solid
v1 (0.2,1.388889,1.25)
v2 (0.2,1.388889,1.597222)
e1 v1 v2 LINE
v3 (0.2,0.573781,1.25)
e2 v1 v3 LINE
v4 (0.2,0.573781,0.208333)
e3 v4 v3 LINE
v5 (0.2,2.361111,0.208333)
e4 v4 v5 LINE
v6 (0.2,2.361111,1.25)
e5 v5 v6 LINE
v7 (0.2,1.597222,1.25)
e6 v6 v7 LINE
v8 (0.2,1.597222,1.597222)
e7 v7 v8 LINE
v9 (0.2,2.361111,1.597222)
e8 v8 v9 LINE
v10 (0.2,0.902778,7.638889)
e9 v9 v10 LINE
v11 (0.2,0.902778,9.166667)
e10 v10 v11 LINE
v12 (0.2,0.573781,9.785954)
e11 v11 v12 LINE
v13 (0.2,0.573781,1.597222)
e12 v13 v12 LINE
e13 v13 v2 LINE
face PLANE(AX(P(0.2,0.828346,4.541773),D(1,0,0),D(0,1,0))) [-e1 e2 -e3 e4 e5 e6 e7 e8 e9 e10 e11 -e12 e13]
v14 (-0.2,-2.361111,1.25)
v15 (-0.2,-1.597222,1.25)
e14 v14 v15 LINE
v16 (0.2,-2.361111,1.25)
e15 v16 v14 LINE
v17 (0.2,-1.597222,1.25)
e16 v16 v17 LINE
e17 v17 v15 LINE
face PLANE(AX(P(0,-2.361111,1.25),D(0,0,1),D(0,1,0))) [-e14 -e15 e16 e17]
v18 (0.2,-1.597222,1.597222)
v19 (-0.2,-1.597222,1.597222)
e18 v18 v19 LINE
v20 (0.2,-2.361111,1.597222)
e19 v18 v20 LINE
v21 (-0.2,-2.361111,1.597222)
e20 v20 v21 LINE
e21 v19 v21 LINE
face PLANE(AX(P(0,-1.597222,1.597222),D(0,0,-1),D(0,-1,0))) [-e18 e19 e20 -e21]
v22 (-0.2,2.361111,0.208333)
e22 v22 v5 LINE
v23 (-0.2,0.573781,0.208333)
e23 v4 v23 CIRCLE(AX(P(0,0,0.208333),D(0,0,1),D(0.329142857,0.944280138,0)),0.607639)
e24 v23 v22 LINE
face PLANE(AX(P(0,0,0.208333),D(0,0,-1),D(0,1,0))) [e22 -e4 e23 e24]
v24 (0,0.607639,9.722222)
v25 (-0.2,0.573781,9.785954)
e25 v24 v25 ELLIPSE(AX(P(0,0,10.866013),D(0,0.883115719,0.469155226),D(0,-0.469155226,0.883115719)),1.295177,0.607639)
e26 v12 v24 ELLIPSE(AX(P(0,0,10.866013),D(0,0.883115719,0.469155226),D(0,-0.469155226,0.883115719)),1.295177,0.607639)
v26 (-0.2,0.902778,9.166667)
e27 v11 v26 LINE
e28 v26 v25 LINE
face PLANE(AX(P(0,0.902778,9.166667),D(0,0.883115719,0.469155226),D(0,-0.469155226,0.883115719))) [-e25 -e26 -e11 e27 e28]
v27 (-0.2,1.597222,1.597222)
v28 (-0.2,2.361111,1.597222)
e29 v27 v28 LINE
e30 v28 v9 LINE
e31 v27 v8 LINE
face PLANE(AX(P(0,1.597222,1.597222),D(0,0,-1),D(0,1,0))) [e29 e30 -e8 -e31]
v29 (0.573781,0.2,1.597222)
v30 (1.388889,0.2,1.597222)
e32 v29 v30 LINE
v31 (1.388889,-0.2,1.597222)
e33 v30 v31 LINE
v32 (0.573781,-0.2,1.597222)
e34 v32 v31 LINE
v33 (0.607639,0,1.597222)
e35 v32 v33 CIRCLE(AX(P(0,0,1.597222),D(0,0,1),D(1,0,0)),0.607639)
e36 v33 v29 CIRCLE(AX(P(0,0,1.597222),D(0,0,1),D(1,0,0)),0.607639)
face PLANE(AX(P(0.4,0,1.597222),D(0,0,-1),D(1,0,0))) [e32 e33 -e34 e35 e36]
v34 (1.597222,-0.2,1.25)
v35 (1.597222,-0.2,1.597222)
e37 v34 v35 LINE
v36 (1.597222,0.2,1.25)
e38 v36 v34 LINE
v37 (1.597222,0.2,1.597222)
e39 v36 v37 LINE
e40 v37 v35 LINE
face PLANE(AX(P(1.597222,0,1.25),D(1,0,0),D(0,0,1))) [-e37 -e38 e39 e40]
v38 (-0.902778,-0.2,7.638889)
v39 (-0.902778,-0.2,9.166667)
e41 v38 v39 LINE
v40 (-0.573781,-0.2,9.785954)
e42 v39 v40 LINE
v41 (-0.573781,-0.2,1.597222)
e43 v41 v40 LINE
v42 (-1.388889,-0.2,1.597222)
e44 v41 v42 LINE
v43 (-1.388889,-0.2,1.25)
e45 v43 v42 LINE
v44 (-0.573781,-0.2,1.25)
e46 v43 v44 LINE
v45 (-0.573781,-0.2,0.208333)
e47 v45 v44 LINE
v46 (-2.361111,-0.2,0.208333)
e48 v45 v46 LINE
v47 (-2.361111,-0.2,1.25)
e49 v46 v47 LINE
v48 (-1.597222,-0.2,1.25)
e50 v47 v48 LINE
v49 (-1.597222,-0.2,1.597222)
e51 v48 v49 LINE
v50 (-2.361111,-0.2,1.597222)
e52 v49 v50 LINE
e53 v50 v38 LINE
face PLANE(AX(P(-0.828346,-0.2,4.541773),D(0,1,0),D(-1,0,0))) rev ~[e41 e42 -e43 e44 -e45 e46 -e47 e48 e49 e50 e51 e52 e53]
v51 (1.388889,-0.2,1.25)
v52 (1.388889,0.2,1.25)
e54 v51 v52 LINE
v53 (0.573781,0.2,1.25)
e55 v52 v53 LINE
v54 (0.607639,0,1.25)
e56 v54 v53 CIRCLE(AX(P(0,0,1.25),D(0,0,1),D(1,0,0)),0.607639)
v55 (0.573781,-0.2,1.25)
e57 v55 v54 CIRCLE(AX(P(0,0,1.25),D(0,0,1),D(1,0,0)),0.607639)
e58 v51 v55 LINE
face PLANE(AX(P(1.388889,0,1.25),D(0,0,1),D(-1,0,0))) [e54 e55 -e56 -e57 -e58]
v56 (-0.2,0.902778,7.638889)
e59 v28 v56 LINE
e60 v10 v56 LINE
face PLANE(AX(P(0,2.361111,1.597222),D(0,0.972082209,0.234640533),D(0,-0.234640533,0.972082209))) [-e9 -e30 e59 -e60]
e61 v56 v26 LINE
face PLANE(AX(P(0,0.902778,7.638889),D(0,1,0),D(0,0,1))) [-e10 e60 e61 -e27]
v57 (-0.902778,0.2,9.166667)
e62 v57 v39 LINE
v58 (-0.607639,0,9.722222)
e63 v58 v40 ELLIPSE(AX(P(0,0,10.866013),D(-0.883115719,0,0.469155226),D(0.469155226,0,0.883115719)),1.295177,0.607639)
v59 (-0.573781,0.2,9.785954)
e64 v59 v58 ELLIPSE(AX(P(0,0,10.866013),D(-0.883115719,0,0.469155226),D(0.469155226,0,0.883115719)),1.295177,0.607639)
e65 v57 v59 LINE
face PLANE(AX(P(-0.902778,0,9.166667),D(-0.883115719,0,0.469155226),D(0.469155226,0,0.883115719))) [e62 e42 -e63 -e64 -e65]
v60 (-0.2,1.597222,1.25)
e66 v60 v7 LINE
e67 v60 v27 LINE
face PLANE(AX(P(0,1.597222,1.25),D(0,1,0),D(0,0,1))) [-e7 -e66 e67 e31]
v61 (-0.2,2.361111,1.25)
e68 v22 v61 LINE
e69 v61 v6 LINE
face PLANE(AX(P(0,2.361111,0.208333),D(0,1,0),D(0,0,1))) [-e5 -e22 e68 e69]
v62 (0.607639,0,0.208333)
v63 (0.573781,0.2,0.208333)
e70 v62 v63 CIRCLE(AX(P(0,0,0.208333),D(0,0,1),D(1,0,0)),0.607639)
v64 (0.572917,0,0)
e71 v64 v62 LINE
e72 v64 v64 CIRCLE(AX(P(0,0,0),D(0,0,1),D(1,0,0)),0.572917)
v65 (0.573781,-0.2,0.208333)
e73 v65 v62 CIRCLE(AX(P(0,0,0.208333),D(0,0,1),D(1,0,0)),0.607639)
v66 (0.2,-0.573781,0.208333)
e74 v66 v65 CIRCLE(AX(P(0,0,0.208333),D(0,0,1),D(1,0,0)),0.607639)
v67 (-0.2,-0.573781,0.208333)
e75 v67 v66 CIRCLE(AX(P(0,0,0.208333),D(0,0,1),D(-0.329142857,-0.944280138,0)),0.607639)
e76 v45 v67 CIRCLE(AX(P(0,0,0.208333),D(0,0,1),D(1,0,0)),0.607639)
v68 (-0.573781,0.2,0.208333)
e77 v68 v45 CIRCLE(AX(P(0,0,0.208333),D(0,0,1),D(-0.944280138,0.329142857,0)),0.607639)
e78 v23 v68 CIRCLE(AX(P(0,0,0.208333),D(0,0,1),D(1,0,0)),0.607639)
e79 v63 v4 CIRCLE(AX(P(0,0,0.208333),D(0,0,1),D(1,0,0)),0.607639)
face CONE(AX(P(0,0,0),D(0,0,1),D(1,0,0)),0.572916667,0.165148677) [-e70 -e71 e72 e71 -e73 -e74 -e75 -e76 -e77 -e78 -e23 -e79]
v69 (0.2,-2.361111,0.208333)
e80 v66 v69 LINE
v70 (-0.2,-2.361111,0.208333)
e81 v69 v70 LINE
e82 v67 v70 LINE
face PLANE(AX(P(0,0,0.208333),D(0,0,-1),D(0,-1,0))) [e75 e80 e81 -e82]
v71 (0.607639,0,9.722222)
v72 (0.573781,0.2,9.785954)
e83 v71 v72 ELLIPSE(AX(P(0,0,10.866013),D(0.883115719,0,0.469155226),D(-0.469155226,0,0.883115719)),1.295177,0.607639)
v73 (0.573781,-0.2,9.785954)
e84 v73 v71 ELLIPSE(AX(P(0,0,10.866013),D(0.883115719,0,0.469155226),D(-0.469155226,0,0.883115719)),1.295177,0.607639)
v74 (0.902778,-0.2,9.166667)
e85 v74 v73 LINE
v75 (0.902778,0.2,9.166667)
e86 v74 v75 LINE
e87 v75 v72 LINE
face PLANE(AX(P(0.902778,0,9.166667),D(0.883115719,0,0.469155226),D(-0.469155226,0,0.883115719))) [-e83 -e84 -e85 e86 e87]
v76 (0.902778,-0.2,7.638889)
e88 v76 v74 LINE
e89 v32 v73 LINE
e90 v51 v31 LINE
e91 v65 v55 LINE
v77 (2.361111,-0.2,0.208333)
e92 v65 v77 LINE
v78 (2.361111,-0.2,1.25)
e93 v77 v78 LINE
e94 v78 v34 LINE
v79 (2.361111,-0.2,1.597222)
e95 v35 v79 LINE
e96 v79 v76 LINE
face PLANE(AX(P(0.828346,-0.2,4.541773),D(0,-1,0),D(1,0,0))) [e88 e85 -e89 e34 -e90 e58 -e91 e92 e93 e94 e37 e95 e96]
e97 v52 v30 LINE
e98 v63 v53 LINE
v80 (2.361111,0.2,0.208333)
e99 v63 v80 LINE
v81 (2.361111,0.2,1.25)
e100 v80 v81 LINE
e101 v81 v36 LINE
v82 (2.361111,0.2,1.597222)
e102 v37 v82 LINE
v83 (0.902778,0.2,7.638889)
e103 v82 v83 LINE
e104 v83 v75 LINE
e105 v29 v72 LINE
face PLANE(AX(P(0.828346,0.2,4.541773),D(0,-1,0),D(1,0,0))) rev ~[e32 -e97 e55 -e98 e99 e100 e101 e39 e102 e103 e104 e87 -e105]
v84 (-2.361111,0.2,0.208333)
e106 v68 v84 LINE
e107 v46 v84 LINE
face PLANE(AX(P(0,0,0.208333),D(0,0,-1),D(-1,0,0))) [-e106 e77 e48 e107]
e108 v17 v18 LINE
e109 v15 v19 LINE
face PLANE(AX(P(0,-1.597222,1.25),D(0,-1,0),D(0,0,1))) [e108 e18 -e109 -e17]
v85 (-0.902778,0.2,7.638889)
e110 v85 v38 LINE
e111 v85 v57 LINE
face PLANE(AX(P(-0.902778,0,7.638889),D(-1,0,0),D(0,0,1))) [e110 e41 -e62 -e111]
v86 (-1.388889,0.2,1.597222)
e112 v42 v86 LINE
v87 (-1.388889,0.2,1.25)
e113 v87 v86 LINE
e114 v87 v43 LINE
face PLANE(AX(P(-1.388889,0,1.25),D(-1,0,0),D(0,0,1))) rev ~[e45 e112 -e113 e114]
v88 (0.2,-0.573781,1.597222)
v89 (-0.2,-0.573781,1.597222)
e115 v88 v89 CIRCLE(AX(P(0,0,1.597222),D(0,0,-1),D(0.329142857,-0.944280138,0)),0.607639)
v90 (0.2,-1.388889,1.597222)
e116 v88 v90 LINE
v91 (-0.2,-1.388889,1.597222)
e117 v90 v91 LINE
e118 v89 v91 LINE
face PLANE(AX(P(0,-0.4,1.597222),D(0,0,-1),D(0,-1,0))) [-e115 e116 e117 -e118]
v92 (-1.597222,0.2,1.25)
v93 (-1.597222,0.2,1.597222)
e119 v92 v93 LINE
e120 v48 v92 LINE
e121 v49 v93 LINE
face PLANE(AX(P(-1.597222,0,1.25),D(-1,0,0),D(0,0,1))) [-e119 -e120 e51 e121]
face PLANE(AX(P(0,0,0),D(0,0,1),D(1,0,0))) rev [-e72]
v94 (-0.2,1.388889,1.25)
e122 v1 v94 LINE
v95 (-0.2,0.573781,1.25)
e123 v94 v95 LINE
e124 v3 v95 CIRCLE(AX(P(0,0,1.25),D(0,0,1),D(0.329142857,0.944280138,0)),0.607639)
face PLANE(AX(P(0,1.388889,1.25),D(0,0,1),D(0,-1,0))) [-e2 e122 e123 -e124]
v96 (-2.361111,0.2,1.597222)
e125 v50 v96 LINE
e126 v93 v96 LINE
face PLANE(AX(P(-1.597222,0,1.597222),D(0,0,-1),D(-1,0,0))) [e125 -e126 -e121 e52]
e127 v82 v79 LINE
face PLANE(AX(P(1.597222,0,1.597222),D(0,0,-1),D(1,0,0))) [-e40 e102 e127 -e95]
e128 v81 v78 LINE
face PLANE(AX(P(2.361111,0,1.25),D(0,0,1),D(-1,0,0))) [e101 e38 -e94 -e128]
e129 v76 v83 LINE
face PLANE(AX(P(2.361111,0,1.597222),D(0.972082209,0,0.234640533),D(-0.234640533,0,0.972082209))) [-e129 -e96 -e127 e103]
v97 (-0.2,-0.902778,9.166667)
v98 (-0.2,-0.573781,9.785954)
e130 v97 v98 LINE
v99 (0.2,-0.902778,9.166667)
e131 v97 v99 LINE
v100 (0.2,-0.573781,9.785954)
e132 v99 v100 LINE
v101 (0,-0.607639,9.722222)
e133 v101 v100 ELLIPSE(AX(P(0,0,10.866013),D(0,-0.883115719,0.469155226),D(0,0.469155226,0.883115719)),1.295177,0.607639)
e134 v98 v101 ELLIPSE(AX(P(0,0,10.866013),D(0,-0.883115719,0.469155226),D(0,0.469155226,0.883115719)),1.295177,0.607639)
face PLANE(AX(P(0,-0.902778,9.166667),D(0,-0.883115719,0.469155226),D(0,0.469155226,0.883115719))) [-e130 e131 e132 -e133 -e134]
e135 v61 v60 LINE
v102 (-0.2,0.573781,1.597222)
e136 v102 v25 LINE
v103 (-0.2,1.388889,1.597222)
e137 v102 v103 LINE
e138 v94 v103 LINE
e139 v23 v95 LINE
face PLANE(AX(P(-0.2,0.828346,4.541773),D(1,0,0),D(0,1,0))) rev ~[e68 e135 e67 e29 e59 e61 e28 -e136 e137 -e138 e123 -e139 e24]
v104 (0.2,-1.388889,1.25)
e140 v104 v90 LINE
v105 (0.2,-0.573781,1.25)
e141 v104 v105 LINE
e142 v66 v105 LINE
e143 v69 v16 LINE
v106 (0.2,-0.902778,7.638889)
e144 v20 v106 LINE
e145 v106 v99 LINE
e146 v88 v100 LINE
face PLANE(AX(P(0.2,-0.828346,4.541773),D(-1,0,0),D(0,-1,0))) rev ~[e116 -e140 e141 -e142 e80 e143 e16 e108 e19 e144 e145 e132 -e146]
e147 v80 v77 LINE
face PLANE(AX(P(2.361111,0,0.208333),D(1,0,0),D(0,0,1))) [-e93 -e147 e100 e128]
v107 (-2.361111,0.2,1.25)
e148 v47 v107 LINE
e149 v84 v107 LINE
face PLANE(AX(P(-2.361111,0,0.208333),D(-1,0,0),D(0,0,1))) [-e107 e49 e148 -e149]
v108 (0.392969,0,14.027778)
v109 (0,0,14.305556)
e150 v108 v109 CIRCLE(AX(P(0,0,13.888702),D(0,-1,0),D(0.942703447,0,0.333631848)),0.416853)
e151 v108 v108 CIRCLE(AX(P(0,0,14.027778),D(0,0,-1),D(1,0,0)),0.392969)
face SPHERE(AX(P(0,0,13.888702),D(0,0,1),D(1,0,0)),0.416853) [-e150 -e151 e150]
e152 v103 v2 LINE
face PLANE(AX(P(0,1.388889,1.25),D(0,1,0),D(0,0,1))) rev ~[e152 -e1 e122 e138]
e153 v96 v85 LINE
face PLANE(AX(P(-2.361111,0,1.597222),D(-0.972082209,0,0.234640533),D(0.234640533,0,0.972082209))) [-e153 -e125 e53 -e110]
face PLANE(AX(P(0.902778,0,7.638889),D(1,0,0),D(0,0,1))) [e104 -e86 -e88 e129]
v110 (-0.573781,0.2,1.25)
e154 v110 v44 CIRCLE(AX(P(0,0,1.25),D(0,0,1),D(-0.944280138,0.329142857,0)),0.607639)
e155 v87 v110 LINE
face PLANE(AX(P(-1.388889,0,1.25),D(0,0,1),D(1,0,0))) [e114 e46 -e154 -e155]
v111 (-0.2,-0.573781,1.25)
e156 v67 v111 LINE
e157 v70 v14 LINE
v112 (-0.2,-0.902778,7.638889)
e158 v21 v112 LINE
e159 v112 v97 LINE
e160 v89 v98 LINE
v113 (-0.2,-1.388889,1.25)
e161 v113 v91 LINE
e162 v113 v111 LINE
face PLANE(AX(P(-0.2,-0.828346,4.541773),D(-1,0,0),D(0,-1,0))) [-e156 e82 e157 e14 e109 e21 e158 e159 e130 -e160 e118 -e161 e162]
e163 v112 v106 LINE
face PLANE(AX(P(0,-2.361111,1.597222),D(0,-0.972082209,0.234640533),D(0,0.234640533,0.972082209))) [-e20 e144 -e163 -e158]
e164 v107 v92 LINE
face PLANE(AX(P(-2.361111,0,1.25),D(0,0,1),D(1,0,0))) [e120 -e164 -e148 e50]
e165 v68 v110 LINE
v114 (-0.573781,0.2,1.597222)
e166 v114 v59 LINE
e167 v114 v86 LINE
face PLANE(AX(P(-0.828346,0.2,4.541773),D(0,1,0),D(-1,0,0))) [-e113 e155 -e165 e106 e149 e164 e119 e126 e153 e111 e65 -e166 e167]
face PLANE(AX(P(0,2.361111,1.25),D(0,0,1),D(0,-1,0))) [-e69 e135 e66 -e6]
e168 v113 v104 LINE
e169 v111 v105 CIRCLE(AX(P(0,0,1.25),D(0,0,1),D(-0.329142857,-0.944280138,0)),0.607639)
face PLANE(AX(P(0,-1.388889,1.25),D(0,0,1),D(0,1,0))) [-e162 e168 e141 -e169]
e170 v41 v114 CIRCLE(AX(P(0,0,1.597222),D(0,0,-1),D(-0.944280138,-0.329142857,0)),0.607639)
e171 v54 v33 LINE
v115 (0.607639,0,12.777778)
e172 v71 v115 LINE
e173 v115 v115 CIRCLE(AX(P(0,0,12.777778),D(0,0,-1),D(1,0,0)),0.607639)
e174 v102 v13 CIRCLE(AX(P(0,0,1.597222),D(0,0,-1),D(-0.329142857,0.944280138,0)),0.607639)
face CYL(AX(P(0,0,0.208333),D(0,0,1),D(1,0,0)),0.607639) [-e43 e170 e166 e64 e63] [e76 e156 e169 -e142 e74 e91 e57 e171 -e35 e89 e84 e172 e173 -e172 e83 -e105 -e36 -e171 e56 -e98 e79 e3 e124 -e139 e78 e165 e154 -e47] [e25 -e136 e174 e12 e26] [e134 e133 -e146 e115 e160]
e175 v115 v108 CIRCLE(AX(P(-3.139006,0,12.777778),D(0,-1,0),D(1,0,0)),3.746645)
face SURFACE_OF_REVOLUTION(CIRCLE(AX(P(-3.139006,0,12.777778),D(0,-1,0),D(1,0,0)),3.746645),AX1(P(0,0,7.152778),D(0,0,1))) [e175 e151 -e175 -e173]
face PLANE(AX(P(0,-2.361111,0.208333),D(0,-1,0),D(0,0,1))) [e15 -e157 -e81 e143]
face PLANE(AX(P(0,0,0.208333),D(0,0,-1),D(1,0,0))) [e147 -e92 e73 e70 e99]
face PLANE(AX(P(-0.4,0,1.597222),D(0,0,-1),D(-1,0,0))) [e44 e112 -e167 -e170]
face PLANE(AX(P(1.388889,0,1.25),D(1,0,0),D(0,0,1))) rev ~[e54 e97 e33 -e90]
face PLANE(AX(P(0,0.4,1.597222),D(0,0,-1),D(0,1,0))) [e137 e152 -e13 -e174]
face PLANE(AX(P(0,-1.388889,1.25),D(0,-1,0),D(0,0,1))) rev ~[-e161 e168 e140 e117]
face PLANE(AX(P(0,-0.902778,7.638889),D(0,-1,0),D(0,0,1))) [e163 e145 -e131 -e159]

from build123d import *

# Parameters (mm, degrees)
F2_W     = 0.2083333333
F2_H     = 0.3472222222
F3_DEPTH = 0.2
F4_COUNT = 4


# Not quite as in the source:
# - a feature names something its author has since deleted; it is built from what else it names


with BuildPart() as f1:
    # F0 (on Front) → F1 (revolve)
    with BuildSketch(Plane.XZ):
        with BuildLine():
            Line((0, 14.3055555556), (0, 0))
            Line((0, 0), (0.5729166667, 0))
            Line((0.5729166667, 0), (0.6076388889, 0.2083333333))
            Line((0.6076388889, 0.2083333333), (0.6076388889, 12.7777777778))
            ThreePointArc((0.6076388889, 12.7777777778), (0.5535814562, 13.4119274316), (0.3929690636, 14.0277777778))
            ThreePointArc((0.3929690636, 14.0277777778), (0.2406164888, 14.2290996444), (0, 14.3055555556))
        make_face()
    revolve(axis=Axis((0, 0, 7.1527777778), (0, 0, 1)))

    # F2 (on Front) → F3 (join, symmetric)
    with BuildSketch(Plane.XZ):
        Polygon((0, 10.8660130719), (0, 0.2083333333), (0.6076388889, 0.2083333333), (2.3611111111, 0.2083333333), (2.3611111111, 1.25), (1.5972222222, 1.25), (1.3888888889, 1.25), (0.4, 1.25), (0.4, 1.5972222222), (1.3888888889, 1.5972222222), (1.5972222222, 1.5972222222), (2.3611111111, 1.5972222222), (0.9027777778, 7.6388888889), (0.9027777778, 9.1666666667), align=None)
        with Locations((1.4930555556, 1.4236111111)):
            Rectangle(F2_W, F2_H)
    extrude(amount=F3_DEPTH, both=True)

    # F4: F1 ×4 about axis
    f4_axis = Axis((0, 0, 0.2083333333), (0, 0, 1))


with BuildPart() as f1_1:
    add(f1.part)
    for i in range(1, F4_COUNT):
        add(f1.part.rotate(f4_axis, i * 360 / F4_COUNT))


solid = f1_1.part
